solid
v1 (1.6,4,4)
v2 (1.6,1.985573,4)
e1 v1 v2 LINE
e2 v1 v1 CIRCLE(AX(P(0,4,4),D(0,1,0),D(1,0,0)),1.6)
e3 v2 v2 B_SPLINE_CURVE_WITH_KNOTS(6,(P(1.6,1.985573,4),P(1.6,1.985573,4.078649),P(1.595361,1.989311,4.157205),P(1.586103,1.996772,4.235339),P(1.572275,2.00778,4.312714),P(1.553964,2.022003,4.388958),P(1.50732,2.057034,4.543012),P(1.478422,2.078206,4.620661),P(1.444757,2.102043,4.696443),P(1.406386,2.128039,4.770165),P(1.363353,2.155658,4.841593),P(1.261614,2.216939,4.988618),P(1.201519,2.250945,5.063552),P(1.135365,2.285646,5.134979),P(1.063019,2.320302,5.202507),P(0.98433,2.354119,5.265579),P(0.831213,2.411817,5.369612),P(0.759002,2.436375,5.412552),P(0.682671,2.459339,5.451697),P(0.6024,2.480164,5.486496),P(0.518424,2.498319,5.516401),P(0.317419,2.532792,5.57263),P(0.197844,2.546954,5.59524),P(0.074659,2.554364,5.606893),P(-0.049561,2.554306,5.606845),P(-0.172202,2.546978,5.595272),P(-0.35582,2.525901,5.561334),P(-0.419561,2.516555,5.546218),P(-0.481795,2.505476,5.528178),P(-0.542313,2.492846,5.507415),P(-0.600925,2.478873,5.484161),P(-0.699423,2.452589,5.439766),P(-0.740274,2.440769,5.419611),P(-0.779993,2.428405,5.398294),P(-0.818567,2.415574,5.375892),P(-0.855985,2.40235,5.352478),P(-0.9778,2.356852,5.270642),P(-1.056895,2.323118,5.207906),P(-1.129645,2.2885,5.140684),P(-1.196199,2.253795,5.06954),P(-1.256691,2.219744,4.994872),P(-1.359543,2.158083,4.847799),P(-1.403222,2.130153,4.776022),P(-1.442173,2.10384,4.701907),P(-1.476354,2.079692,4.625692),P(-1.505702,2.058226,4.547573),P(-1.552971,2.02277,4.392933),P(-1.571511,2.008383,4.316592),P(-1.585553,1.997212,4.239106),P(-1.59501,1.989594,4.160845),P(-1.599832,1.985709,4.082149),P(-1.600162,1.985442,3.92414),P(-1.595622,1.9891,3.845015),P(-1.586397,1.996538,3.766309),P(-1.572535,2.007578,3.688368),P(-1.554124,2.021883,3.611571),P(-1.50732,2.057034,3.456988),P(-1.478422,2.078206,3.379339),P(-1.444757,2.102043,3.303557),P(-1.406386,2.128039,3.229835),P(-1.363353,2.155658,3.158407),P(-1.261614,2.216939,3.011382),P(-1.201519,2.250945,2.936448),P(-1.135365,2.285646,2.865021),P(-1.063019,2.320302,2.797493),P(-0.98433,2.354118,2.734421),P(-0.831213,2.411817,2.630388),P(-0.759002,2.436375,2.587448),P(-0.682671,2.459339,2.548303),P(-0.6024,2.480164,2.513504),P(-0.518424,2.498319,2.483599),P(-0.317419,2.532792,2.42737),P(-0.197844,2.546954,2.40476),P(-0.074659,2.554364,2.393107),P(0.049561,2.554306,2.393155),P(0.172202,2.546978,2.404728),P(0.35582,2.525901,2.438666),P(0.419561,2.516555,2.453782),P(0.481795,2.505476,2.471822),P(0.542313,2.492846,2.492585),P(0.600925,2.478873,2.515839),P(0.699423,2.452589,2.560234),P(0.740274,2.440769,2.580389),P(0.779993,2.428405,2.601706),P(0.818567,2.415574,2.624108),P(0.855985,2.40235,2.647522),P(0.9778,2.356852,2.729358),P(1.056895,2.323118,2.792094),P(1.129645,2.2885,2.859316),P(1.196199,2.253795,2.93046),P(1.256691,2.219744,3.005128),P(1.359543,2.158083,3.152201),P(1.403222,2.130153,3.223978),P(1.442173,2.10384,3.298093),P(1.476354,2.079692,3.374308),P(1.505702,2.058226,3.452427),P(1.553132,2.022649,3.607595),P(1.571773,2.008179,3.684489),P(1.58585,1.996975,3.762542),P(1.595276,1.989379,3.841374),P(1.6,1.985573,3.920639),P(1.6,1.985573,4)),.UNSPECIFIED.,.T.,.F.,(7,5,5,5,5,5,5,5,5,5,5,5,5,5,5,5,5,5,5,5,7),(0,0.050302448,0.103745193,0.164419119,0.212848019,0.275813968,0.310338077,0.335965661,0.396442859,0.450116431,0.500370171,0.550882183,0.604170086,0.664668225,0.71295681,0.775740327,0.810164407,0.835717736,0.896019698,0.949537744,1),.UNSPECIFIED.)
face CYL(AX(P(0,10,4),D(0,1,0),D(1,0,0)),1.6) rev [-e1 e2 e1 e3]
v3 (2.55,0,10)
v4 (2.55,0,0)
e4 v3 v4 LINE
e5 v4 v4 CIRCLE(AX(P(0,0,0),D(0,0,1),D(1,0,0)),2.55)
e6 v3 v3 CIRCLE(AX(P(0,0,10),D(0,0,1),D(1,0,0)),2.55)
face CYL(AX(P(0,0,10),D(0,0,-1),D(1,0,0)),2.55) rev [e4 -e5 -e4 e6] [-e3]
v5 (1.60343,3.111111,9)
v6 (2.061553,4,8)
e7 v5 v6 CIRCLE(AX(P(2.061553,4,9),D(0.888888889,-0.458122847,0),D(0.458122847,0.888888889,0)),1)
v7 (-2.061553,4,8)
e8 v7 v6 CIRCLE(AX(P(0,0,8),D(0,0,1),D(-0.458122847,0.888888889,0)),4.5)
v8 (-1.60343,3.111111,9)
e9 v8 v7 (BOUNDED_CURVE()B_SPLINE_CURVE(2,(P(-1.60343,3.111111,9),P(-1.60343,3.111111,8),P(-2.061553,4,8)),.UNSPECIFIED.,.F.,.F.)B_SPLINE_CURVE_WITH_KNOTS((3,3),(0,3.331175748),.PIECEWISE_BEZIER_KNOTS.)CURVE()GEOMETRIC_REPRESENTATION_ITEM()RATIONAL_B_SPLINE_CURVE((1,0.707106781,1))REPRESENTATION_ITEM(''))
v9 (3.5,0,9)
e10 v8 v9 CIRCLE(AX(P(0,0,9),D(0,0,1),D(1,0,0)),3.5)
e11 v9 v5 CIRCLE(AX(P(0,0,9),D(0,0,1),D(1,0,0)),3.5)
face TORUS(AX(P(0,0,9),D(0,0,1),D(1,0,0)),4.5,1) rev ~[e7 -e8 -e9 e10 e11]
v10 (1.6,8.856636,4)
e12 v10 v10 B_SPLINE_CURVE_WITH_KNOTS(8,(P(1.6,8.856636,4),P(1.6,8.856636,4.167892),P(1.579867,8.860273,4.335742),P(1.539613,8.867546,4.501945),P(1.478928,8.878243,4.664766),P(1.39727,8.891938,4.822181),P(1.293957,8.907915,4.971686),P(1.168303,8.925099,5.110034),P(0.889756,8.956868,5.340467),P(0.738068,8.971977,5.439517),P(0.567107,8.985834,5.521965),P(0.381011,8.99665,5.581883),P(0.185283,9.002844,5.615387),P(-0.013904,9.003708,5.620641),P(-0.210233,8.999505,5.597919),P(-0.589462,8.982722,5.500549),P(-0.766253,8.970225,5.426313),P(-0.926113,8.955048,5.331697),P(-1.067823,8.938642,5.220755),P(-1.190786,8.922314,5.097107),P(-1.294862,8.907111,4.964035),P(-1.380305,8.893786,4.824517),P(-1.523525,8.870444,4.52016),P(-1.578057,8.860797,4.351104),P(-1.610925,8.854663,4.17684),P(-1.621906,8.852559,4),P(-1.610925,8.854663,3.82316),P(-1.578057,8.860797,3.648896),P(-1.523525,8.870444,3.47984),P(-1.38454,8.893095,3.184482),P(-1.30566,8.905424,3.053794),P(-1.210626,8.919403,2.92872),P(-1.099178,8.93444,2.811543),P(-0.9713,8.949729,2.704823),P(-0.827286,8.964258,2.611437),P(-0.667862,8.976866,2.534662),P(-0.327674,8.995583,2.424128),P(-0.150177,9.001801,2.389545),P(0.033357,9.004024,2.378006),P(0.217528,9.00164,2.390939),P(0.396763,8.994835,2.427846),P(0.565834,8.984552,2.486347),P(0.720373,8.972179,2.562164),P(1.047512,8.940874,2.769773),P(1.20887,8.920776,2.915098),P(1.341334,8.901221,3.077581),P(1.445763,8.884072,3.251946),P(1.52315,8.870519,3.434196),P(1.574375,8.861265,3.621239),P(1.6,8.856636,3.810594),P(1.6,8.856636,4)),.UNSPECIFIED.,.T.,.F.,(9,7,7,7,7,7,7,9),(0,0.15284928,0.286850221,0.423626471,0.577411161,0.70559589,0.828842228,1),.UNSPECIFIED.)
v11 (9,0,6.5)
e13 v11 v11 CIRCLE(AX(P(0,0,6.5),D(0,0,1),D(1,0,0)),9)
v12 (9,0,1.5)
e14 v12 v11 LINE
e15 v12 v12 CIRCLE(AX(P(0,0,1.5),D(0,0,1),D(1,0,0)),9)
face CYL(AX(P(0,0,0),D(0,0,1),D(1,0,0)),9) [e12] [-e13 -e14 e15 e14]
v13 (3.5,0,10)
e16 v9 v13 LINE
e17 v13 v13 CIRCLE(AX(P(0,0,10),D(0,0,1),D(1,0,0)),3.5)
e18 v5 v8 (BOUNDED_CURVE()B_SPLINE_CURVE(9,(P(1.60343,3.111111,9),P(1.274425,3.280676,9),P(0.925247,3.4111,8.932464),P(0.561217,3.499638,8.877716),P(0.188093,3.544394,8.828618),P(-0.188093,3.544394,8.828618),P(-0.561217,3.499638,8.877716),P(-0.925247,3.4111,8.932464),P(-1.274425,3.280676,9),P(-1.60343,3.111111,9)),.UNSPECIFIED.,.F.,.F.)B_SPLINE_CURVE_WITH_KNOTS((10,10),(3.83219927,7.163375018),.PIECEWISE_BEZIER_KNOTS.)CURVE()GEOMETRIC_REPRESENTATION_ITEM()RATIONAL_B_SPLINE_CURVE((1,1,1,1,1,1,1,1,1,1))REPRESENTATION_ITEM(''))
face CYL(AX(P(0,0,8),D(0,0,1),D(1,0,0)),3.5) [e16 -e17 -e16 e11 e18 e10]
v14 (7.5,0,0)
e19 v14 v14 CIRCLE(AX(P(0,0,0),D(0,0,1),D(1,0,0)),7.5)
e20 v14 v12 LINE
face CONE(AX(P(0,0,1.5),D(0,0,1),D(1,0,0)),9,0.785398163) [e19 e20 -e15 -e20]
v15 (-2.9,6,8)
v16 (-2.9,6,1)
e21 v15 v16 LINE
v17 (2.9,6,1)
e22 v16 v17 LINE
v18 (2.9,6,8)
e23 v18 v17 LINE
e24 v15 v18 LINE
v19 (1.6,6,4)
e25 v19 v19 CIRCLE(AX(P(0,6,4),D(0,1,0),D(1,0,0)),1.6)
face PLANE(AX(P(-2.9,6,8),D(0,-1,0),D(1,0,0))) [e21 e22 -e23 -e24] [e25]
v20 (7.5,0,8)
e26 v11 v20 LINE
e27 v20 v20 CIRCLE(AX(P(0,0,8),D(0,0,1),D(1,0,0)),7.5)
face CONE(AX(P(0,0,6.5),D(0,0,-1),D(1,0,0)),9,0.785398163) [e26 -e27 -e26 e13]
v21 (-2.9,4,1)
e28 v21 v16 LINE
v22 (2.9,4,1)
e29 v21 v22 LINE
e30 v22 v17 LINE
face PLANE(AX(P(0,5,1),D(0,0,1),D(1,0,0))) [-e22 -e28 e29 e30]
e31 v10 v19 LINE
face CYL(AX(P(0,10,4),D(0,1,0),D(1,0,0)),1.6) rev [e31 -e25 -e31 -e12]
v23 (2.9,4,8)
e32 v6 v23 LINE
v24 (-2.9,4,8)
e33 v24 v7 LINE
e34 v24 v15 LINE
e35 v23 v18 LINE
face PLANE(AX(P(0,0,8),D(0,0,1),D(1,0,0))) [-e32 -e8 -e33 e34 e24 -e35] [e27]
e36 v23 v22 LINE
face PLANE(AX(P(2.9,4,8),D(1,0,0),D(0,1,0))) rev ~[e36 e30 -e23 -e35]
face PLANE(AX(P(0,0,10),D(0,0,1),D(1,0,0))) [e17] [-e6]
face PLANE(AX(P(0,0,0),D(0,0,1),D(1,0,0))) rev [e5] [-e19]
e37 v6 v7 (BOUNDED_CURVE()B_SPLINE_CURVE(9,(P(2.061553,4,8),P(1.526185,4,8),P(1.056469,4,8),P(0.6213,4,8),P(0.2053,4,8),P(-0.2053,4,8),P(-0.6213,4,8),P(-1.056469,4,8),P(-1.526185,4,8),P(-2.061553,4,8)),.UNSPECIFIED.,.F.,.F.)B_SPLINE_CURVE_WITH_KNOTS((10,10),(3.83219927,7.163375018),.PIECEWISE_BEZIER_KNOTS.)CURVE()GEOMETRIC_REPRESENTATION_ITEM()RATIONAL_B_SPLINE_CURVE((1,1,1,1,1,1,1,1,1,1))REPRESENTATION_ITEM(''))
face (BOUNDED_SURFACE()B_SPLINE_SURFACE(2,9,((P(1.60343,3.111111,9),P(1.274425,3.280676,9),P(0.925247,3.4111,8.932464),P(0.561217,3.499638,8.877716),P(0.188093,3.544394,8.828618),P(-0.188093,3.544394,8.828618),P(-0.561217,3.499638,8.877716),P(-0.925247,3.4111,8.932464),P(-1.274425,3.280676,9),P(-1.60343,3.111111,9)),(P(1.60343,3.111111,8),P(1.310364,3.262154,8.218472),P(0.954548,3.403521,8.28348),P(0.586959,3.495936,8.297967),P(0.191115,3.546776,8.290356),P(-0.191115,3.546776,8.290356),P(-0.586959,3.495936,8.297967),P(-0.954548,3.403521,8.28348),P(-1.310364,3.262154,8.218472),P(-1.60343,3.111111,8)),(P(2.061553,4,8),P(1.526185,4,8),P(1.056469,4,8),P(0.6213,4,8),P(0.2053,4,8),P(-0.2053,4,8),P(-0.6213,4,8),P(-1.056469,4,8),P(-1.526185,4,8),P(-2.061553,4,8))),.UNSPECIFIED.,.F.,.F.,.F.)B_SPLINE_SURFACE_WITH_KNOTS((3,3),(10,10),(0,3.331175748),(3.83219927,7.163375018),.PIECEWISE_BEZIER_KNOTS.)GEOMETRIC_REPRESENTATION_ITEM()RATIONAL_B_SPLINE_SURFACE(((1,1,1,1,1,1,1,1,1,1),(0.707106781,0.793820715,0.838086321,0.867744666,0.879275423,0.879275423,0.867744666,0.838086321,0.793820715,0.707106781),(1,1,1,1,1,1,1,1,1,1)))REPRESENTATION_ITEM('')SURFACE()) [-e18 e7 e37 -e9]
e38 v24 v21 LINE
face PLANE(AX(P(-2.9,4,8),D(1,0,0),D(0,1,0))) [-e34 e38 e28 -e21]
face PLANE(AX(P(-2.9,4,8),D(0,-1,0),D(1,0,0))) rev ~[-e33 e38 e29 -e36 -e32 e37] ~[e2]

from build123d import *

# Parameters (mm, degrees)
F2_W     = 5.8
F2_H     = 2
F3_DEPTH = 7
F5_R     = 1.6
F6_REACH = 23.5264833996
F7_SIZE  = 1.5
F8_R     = 1


with BuildPart() as f1:
    # F0 (on Front) → F1 (revolve)
    with BuildSketch(Plane.XZ):
        Polygon((2.55, 10), (2.55, 0), (9, 0), (9, 8), (3.5, 8), (3.5, 10), align=None)
    revolve(axis=Axis((0, 0, 10), (0, 0, 1)))

    # F2 (on face) → F3 (cut)
    with BuildSketch(Plane.XY.offset(8)):
        with Locations((0, 5)):
            Rectangle(F2_W, F2_H)
    extrude(amount=-F3_DEPTH, mode=Mode.SUBTRACT)

    f6_end = f1.faces().sort_by_distance((-2.55, 0, 5))[0]
    # F5 (on offset) → F6 (cut, up to a face of the model that its end follows)
    with BuildSketch(Plane.XZ.offset(-10)):
        with Locations((0, 4)):
            Circle(F5_R)
    f6_long = extrude(amount=F6_REACH, mode=Mode.PRIVATE)
    add(split(f6_long, bisect_by=f6_end, keep=Keep.ALL, mode=Mode.PRIVATE).solids().sort_by_distance((0, 10, 4))[0], mode=Mode.SUBTRACT)

    # F7
    f7_edges = [f1.edges().sort_by_distance(p)[0] for p in [
        (-9, 0, 8),
        (-9, 0, 0),
    ]]
    chamfer(f7_edges, length=F7_SIZE)

    # F8
    f8_edges = [f1.edges().sort_by_distance(p)[0] for p in [
        (-3.5, 0, 8),
    ]]
    fillet(f8_edges, radius=F8_R)


solid = f1.part
